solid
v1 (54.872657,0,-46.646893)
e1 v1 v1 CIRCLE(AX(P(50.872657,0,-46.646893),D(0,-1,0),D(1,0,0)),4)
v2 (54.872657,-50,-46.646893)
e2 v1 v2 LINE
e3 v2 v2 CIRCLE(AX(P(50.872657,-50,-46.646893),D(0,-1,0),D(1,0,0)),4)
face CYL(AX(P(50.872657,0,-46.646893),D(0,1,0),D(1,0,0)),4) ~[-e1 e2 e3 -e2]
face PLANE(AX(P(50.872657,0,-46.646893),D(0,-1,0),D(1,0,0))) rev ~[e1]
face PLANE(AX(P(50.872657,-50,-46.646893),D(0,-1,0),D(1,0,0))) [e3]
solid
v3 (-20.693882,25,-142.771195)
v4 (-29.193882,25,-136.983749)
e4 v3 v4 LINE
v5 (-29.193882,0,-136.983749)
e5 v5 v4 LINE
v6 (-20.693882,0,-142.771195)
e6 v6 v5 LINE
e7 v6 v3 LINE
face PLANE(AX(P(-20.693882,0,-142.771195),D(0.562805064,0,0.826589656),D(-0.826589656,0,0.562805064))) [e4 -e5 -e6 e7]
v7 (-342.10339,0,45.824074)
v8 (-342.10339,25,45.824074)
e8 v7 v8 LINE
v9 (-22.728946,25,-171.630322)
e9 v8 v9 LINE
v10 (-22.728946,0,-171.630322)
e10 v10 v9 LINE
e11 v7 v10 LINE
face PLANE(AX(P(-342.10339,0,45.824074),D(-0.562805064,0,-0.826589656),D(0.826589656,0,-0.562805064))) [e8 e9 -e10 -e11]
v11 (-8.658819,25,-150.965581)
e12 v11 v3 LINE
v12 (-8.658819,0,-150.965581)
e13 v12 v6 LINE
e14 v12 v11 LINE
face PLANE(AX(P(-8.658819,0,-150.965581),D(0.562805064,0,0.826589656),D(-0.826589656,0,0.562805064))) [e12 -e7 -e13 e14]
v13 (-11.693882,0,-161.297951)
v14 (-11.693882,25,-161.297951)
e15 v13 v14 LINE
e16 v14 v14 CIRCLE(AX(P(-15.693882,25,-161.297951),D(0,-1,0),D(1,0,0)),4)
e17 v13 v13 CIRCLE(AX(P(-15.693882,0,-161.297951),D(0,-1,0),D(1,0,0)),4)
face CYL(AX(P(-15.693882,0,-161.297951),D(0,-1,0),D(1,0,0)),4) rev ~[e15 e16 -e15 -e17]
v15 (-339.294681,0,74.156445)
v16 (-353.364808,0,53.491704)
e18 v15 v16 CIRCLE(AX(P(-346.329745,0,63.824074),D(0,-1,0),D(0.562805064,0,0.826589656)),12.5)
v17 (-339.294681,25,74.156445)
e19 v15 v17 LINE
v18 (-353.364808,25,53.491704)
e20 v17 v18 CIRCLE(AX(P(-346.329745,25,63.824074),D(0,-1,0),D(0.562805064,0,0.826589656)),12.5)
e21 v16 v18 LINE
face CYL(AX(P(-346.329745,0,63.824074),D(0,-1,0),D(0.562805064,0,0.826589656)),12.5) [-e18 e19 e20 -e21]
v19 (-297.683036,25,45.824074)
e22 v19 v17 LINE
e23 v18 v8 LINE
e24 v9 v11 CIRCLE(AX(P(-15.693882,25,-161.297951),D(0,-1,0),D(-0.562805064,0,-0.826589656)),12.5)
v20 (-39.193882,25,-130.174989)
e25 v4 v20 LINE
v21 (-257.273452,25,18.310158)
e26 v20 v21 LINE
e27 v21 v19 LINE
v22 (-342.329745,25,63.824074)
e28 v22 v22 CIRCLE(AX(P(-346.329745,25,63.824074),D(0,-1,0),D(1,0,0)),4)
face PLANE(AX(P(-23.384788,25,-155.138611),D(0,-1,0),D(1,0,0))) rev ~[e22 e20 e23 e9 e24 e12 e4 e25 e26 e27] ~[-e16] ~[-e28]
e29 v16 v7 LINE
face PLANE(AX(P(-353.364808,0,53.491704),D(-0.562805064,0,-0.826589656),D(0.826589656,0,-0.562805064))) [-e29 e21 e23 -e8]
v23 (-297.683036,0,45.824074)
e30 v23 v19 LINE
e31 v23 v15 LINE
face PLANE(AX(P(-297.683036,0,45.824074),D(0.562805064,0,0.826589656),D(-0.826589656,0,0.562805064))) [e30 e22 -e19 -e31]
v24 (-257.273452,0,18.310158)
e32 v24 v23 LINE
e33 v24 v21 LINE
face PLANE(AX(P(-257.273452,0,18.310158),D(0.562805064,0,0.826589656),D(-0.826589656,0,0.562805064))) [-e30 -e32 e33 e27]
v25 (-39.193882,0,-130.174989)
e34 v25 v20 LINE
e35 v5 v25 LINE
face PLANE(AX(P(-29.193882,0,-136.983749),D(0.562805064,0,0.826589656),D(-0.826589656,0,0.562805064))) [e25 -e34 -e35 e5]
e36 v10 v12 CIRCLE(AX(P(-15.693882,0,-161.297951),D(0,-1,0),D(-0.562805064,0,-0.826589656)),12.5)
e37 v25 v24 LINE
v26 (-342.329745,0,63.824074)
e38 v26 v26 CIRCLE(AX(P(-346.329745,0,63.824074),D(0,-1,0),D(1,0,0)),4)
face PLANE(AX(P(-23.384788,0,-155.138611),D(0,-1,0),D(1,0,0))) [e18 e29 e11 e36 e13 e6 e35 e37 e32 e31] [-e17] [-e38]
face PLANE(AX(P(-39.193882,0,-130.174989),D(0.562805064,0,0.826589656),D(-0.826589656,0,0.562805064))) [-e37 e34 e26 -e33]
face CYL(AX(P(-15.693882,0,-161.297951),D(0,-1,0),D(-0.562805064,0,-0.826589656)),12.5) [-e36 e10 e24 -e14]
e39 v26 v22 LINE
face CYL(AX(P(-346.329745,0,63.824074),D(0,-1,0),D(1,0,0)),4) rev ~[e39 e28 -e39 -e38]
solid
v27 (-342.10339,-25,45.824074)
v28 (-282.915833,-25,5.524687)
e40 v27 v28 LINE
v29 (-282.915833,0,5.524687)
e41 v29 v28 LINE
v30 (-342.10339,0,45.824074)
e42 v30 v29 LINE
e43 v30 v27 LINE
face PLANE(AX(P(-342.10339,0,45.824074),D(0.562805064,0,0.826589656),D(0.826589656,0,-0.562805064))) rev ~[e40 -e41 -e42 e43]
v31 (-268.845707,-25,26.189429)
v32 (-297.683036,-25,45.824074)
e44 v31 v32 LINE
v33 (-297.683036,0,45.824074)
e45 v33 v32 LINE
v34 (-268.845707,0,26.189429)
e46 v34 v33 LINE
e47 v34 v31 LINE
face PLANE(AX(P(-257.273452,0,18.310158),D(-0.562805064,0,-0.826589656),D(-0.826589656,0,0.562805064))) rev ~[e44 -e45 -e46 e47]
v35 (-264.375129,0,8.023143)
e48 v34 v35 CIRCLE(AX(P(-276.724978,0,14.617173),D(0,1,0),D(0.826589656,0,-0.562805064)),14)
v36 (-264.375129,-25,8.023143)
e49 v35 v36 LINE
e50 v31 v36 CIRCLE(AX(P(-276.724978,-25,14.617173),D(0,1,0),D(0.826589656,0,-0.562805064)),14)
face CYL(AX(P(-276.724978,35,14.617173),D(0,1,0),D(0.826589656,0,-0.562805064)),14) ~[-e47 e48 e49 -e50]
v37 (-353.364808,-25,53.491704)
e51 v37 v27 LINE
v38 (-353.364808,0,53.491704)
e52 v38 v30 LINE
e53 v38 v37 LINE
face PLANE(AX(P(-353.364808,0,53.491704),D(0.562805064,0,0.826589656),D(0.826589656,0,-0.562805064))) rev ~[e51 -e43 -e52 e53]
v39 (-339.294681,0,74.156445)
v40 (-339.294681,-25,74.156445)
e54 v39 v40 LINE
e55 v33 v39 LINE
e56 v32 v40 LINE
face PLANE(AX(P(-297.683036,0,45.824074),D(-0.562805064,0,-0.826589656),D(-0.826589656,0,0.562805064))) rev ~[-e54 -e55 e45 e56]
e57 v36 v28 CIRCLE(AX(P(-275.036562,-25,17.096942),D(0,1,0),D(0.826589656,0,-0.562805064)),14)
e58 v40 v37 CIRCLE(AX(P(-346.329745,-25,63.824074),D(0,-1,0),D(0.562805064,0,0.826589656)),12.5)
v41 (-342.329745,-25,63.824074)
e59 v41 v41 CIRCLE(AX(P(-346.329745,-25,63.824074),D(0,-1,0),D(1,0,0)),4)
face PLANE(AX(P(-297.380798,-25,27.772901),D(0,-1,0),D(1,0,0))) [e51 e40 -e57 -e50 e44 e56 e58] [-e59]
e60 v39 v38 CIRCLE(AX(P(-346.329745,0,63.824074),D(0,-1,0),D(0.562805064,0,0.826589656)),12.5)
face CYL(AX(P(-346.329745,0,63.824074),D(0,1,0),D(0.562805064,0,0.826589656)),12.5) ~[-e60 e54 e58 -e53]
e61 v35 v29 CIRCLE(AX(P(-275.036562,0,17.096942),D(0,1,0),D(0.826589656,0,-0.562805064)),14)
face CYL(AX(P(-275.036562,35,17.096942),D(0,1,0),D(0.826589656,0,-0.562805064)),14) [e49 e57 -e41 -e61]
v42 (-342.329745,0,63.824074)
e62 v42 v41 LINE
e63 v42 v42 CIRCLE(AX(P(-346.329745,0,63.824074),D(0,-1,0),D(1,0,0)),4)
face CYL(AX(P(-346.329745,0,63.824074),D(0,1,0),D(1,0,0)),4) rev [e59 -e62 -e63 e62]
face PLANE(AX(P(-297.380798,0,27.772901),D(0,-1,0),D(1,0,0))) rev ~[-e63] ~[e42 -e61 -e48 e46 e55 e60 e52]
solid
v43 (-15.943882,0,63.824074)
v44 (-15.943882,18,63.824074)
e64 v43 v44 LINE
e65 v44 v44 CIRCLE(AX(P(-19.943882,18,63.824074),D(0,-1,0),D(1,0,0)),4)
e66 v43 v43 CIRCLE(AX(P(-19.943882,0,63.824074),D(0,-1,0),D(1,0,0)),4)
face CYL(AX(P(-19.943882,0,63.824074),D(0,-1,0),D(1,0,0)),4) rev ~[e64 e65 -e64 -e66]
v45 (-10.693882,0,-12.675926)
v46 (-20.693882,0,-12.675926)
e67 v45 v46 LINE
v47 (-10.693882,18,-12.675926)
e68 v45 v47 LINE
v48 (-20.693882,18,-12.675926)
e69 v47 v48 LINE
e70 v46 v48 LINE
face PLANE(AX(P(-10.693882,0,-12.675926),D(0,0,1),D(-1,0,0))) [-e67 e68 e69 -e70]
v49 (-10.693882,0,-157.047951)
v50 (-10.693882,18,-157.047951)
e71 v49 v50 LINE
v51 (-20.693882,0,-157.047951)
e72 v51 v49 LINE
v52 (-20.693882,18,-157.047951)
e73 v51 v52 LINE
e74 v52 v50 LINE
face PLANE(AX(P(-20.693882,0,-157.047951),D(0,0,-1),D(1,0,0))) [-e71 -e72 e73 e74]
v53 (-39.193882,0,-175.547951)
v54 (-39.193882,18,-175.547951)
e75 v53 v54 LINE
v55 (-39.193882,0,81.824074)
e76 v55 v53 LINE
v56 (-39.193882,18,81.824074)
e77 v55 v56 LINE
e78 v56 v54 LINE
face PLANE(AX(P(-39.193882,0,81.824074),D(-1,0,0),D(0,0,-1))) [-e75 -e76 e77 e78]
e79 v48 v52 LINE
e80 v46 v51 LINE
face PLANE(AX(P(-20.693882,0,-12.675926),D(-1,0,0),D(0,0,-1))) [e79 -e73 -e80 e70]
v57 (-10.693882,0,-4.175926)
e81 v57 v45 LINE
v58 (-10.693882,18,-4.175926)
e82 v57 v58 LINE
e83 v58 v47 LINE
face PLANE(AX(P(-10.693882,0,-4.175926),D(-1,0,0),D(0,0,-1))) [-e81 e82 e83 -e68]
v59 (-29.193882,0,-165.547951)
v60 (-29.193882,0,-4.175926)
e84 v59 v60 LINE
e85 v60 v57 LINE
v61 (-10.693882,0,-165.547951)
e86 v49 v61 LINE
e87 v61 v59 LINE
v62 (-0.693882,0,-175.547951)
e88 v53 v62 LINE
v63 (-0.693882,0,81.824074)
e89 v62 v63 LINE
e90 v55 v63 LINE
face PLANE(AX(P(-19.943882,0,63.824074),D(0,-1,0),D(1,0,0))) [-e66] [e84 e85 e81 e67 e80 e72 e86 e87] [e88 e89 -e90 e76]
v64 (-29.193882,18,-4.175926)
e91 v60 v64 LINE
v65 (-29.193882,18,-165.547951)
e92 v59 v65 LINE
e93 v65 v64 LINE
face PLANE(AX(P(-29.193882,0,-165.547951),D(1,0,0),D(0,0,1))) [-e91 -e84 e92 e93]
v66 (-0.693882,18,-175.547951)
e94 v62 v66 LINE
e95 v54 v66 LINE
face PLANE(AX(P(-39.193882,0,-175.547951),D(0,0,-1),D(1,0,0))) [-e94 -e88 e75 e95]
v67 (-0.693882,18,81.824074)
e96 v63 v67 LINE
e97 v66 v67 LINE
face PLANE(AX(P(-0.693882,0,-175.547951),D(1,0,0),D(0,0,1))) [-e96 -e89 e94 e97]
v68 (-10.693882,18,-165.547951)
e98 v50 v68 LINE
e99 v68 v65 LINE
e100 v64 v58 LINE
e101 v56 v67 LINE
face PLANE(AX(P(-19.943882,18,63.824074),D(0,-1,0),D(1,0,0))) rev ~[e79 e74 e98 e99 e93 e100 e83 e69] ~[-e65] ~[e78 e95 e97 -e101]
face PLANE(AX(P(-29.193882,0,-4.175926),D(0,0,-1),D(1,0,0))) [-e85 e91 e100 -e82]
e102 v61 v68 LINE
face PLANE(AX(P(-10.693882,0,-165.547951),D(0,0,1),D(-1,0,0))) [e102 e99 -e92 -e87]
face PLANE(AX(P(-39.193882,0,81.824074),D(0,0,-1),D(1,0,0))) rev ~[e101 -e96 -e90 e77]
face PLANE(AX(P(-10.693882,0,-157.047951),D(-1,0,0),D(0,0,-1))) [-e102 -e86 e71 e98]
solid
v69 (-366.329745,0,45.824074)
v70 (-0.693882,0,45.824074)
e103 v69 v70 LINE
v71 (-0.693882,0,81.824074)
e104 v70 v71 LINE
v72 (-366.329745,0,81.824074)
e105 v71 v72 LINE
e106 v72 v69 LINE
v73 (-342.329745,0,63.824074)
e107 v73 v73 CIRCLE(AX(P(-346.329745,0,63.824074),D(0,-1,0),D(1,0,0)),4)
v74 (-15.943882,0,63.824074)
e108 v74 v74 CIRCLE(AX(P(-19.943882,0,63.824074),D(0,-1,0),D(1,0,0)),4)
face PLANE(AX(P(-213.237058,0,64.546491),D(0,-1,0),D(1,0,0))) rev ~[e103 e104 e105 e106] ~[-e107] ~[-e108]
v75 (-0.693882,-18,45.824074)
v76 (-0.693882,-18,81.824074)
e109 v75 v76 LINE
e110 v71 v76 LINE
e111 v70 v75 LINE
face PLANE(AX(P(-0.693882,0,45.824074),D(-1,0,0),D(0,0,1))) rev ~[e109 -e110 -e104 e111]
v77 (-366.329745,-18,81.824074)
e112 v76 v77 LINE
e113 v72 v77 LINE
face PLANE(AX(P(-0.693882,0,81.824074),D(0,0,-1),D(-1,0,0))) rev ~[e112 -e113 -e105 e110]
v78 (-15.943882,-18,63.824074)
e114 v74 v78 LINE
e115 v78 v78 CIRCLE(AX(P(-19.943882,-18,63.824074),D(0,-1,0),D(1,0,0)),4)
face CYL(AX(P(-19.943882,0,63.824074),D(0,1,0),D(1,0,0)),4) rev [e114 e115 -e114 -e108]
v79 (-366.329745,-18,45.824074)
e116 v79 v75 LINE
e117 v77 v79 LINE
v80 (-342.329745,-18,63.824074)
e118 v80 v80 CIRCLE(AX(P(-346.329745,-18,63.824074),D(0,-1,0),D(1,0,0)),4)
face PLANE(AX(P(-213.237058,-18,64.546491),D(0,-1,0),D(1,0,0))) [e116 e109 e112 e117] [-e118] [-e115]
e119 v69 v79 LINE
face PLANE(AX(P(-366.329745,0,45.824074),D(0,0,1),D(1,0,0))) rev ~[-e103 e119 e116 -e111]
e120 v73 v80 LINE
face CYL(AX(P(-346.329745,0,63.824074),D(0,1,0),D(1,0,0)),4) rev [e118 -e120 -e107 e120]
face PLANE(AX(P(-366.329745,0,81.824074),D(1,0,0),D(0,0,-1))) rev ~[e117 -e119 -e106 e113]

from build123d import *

# Parameters (mm, degrees)
F0_W        = 38.5
F0_H        = 36
F0_R        = 4
F1_DEPTH    = 18
F2_DEPTH    = 18
F3_DEPTH    = 25
F4_R        = 4
F5_DEPTH    = 50
F6_DEPTH    = 25
F7_T1_DEPTH = 95


# Not quite as in the source:
# - a fillet or chamfer that OpenCascade refuses, or shapes differently, is made with other operations: its cross-section is extruded or revolved along the edge and cut away or added


with BuildPart() as f1:
    # F0 (on Front) → F1 (new body)
    with BuildSketch(Plane.XZ):
        with Locations((-19.9438821999, 63.8240744194)):
            Rectangle(F0_W, F0_H)
        with Locations((-19.9438821999, 63.8240744194)):
            Circle(F0_R, mode=Mode.SUBTRACT)
        with BuildLine():
            Line((-0.6938821999, 45.8240744194), (-39.1938821999, 45.8240744194))
            Line((-39.1938821999, 45.8240744194), (-39.1938821999, -130.1749886339))
            Line((-39.1938821999, -130.1749886339), (-29.1938821999, -136.9837487019))
            Line((-29.1938821999, -136.9837487019), (-29.1938821999, -4.1759255806))
            Line((-29.1938821999, -4.1759255806), (-10.6938821999, -4.1759255806))
            Line((-10.6938821999, -4.1759255806), (-10.6938821999, -12.6759255806))
            Line((-10.6938821999, -12.6759255806), (-20.6938821999, -12.6759255806))
            Line((-20.6938821999, -12.6759255806), (-20.6938821999, -142.7711947596))
            Line((-20.6938821999, -142.7711947596), (-8.658818896, -150.9655806035))
            ThreePointArc((-8.658818896, -150.9655806035), (-5.3615114985, -168.3330146088), (-22.7289455038, -171.6303220062))
            Line((-22.7289455038, -171.6303220062), (-39.1938821999, -160.4197416564))
            Line((-39.1938821999, -160.4197416564), (-39.1938821999, -175.5479513049))
            Line((-39.1938821999, -175.5479513049), (-0.6938821999, -175.5479513049))
            Line((-0.6938821999, -175.5479513049), (-0.6938821999, 45.8240744194))
        make_face()
        with BuildLine():
            Line((-29.1938821999, -136.9837487019), (-39.1938821999, -130.1749886339))
            Line((-39.1938821999, -130.1749886339), (-39.1938821999, -160.4197416564))
            Line((-39.1938821999, -160.4197416564), (-22.7289455038, -171.6303220062))
            ThreePointArc((-22.7289455038, -171.6303220062), (-5.3615114985, -168.3330146088), (-8.658818896, -150.9655806035))
            Line((-8.658818896, -150.9655806035), (-20.6938821999, -142.7711947596))
            Line((-20.6938821999, -142.7711947596), (-20.6938821999, -157.0479513049))
            Line((-20.6938821999, -157.0479513049), (-10.6938821999, -157.0479513049))
            Line((-10.6938821999, -157.0479513049), (-10.6938821999, -165.5479513049))
            Line((-10.6938821999, -165.5479513049), (-29.1938821999, -165.5479513049))
            Line((-29.1938821999, -165.5479513049), (-29.1938821999, -136.9837487019))
        make_face()
    extrude(amount=-F1_DEPTH)


with BuildPart() as f2:
    # F0 (on Front) → F2 (new body)
    with BuildSketch(Plane.XZ):
        with BuildLine():
            Line((-39.1938821999, 45.8240744194), (-39.1938821999, 81.8240744194))
            Line((-39.1938821999, 81.8240744194), (-366.3297446435, 81.8240744194))
            Line((-366.3297446435, 81.8240744194), (-366.3297446435, 45.8240744194))
            Line((-366.3297446435, 45.8240744194), (-342.1033899768, 45.8240744194))
            Line((-342.1033899768, 45.8240744194), (-353.3648079474, 53.491703718))
            ThreePointArc((-353.3648079474, 53.491703718), (-356.6621153449, 70.8591377232), (-339.2946813396, 74.1564451207))
            Line((-339.2946813396, 74.1564451207), (-297.6830363138, 45.8240744194))
            Line((-297.6830363138, 45.8240744194), (-39.1938821999, 45.8240744194))
        make_face()
        with Locations((-19.9438821999, 63.8240744194)):
            Rectangle(F0_W, F0_H)
        with Locations((-19.9438821999, 63.8240744194)):
            Circle(F0_R, mode=Mode.SUBTRACT)
        with BuildLine():
            Line((-342.1033899768, 45.8240744194), (-297.6830363138, 45.8240744194))
            Line((-297.6830363138, 45.8240744194), (-339.2946813396, 74.1564451207))
            ThreePointArc((-339.2946813396, 74.1564451207), (-356.6621153449, 70.8591377232), (-353.3648079474, 53.491703718))
            Line((-353.3648079474, 53.491703718), (-342.1033899768, 45.8240744194))
        make_face()
        with Locations((-346.3297446435, 63.8240744194)):
            Circle(F0_R, mode=Mode.SUBTRACT)
    extrude(amount=F2_DEPTH)


with BuildPart() as f3:
    # F0 (on Front) → F3 (new body)
    with BuildSketch(Plane.XZ):
        with BuildLine():
            Line((-29.1938821999, -136.9837487019), (-39.1938821999, -130.1749886339))
            Line((-39.1938821999, -130.1749886339), (-39.1938821999, -160.4197416564))
            Line((-39.1938821999, -160.4197416564), (-22.7289455038, -171.6303220062))
            ThreePointArc((-22.7289455038, -171.6303220062), (-5.3615114985, -168.3330146088), (-8.658818896, -150.9655806035))
            Line((-8.658818896, -150.9655806035), (-20.6938821999, -142.7711947596))
            Line((-20.6938821999, -142.7711947596), (-20.6938821999, -157.0479513049))
            Line((-20.6938821999, -157.0479513049), (-10.6938821999, -157.0479513049))
            Line((-10.6938821999, -157.0479513049), (-10.6938821999, -165.5479513049))
            Line((-10.6938821999, -165.5479513049), (-29.1938821999, -165.5479513049))
            Line((-29.1938821999, -165.5479513049), (-29.1938821999, -136.9837487019))
        make_face()
        Polygon((-39.1938821999, -160.4197416564), (-39.1938821999, -130.1749886339), (-257.2734515904, 18.3101577365), (-271.3435781981, -2.3545836662), align=None)
        Polygon((-20.6938821999, -142.7711947596), (-29.1938821999, -136.9837487019), (-29.1938821999, -165.5479513049), (-10.6938821999, -165.5479513049), (-10.6938821999, -157.0479513049), (-20.6938821999, -157.0479513049), align=None)
        with Locations((-15.6938821999, -161.2979513049)):
            Circle(F0_R, mode=Mode.SUBTRACT)
        with BuildLine():
            Line((-342.1033899768, 45.8240744194), (-297.6830363138, 45.8240744194))
            Line((-297.6830363138, 45.8240744194), (-339.2946813396, 74.1564451207))
            ThreePointArc((-339.2946813396, 74.1564451207), (-356.6621153449, 70.8591377232), (-353.3648079474, 53.491703718))
            Line((-353.3648079474, 53.491703718), (-342.1033899768, 45.8240744194))
        make_face()
        with Locations((-346.3297446435, 63.8240744194)):
            Circle(F0_R, mode=Mode.SUBTRACT)
        Polygon((-257.2734515904, 18.3101577365), (-297.6830363138, 45.8240744194), (-342.1033899768, 45.8240744194), (-271.3435781981, -2.3545836662), align=None)
    extrude(amount=-F3_DEPTH)


with BuildPart() as f5:
    # F4 (on Front) → F5 (new body)
    with BuildSketch(Plane.XZ):
        with Locations((50.8726574481, -46.6468930244)):
            Circle(F4_R)
    extrude(amount=F5_DEPTH)


with BuildPart() as f6:
    # F0 (on Front) → F6 (new body)
    with BuildSketch(Plane.XZ):
        Polygon((-257.2734515904, 18.3101577365), (-297.6830363138, 45.8240744194), (-342.1033899768, 45.8240744194), (-271.3435781981, -2.3545836662), align=None)
        with BuildLine():
            Line((-342.1033899768, 45.8240744194), (-297.6830363138, 45.8240744194))
            Line((-297.6830363138, 45.8240744194), (-339.2946813396, 74.1564451207))
            ThreePointArc((-339.2946813396, 74.1564451207), (-356.6621153449, 70.8591377232), (-353.3648079474, 53.491703718))
            Line((-353.3648079474, 53.491703718), (-342.1033899768, 45.8240744194))
        make_face()
        with Locations((-346.3297446435, 63.8240744194)):
            Circle(F0_R, mode=Mode.SUBTRACT)
    extrude(amount=F6_DEPTH)

    # F7: fillet of radius 14 on 2 edges, made by hand

    # F7_s2 → F7_t1 (cut)
    with BuildSketch(Plane.XZ.offset(-35)):
        with BuildLine():
            ThreePointArc((-265.1527224907, 6.737902551), (-262.9706716765, 17.2285076822), (-268.8457067759, 26.1894286369))
            Line((-268.8457067759, 26.1894286369), (-257.2734515904, 18.3101577365))
            Line((-257.2734515904, 18.3101577365), (-265.1527224907, 6.737902551))
        make_face()
        with BuildLine():
            ThreePointArc((-263.4643072978, 9.2176715193), (-272.4252282525, 3.3426364199), (-282.9158333837, 5.5246872342))
            Line((-282.9158333837, 5.5246872342), (-271.3435781981, -2.3545836662))
            Line((-271.3435781981, -2.3545836662), (-263.4643072978, 9.2176715193))
        make_face()
    extrude(amount=F7_T1_DEPTH, mode=Mode.SUBTRACT)


solid = Compound([f1.part, f2.part, f3.part, f5.part, f6.part])
